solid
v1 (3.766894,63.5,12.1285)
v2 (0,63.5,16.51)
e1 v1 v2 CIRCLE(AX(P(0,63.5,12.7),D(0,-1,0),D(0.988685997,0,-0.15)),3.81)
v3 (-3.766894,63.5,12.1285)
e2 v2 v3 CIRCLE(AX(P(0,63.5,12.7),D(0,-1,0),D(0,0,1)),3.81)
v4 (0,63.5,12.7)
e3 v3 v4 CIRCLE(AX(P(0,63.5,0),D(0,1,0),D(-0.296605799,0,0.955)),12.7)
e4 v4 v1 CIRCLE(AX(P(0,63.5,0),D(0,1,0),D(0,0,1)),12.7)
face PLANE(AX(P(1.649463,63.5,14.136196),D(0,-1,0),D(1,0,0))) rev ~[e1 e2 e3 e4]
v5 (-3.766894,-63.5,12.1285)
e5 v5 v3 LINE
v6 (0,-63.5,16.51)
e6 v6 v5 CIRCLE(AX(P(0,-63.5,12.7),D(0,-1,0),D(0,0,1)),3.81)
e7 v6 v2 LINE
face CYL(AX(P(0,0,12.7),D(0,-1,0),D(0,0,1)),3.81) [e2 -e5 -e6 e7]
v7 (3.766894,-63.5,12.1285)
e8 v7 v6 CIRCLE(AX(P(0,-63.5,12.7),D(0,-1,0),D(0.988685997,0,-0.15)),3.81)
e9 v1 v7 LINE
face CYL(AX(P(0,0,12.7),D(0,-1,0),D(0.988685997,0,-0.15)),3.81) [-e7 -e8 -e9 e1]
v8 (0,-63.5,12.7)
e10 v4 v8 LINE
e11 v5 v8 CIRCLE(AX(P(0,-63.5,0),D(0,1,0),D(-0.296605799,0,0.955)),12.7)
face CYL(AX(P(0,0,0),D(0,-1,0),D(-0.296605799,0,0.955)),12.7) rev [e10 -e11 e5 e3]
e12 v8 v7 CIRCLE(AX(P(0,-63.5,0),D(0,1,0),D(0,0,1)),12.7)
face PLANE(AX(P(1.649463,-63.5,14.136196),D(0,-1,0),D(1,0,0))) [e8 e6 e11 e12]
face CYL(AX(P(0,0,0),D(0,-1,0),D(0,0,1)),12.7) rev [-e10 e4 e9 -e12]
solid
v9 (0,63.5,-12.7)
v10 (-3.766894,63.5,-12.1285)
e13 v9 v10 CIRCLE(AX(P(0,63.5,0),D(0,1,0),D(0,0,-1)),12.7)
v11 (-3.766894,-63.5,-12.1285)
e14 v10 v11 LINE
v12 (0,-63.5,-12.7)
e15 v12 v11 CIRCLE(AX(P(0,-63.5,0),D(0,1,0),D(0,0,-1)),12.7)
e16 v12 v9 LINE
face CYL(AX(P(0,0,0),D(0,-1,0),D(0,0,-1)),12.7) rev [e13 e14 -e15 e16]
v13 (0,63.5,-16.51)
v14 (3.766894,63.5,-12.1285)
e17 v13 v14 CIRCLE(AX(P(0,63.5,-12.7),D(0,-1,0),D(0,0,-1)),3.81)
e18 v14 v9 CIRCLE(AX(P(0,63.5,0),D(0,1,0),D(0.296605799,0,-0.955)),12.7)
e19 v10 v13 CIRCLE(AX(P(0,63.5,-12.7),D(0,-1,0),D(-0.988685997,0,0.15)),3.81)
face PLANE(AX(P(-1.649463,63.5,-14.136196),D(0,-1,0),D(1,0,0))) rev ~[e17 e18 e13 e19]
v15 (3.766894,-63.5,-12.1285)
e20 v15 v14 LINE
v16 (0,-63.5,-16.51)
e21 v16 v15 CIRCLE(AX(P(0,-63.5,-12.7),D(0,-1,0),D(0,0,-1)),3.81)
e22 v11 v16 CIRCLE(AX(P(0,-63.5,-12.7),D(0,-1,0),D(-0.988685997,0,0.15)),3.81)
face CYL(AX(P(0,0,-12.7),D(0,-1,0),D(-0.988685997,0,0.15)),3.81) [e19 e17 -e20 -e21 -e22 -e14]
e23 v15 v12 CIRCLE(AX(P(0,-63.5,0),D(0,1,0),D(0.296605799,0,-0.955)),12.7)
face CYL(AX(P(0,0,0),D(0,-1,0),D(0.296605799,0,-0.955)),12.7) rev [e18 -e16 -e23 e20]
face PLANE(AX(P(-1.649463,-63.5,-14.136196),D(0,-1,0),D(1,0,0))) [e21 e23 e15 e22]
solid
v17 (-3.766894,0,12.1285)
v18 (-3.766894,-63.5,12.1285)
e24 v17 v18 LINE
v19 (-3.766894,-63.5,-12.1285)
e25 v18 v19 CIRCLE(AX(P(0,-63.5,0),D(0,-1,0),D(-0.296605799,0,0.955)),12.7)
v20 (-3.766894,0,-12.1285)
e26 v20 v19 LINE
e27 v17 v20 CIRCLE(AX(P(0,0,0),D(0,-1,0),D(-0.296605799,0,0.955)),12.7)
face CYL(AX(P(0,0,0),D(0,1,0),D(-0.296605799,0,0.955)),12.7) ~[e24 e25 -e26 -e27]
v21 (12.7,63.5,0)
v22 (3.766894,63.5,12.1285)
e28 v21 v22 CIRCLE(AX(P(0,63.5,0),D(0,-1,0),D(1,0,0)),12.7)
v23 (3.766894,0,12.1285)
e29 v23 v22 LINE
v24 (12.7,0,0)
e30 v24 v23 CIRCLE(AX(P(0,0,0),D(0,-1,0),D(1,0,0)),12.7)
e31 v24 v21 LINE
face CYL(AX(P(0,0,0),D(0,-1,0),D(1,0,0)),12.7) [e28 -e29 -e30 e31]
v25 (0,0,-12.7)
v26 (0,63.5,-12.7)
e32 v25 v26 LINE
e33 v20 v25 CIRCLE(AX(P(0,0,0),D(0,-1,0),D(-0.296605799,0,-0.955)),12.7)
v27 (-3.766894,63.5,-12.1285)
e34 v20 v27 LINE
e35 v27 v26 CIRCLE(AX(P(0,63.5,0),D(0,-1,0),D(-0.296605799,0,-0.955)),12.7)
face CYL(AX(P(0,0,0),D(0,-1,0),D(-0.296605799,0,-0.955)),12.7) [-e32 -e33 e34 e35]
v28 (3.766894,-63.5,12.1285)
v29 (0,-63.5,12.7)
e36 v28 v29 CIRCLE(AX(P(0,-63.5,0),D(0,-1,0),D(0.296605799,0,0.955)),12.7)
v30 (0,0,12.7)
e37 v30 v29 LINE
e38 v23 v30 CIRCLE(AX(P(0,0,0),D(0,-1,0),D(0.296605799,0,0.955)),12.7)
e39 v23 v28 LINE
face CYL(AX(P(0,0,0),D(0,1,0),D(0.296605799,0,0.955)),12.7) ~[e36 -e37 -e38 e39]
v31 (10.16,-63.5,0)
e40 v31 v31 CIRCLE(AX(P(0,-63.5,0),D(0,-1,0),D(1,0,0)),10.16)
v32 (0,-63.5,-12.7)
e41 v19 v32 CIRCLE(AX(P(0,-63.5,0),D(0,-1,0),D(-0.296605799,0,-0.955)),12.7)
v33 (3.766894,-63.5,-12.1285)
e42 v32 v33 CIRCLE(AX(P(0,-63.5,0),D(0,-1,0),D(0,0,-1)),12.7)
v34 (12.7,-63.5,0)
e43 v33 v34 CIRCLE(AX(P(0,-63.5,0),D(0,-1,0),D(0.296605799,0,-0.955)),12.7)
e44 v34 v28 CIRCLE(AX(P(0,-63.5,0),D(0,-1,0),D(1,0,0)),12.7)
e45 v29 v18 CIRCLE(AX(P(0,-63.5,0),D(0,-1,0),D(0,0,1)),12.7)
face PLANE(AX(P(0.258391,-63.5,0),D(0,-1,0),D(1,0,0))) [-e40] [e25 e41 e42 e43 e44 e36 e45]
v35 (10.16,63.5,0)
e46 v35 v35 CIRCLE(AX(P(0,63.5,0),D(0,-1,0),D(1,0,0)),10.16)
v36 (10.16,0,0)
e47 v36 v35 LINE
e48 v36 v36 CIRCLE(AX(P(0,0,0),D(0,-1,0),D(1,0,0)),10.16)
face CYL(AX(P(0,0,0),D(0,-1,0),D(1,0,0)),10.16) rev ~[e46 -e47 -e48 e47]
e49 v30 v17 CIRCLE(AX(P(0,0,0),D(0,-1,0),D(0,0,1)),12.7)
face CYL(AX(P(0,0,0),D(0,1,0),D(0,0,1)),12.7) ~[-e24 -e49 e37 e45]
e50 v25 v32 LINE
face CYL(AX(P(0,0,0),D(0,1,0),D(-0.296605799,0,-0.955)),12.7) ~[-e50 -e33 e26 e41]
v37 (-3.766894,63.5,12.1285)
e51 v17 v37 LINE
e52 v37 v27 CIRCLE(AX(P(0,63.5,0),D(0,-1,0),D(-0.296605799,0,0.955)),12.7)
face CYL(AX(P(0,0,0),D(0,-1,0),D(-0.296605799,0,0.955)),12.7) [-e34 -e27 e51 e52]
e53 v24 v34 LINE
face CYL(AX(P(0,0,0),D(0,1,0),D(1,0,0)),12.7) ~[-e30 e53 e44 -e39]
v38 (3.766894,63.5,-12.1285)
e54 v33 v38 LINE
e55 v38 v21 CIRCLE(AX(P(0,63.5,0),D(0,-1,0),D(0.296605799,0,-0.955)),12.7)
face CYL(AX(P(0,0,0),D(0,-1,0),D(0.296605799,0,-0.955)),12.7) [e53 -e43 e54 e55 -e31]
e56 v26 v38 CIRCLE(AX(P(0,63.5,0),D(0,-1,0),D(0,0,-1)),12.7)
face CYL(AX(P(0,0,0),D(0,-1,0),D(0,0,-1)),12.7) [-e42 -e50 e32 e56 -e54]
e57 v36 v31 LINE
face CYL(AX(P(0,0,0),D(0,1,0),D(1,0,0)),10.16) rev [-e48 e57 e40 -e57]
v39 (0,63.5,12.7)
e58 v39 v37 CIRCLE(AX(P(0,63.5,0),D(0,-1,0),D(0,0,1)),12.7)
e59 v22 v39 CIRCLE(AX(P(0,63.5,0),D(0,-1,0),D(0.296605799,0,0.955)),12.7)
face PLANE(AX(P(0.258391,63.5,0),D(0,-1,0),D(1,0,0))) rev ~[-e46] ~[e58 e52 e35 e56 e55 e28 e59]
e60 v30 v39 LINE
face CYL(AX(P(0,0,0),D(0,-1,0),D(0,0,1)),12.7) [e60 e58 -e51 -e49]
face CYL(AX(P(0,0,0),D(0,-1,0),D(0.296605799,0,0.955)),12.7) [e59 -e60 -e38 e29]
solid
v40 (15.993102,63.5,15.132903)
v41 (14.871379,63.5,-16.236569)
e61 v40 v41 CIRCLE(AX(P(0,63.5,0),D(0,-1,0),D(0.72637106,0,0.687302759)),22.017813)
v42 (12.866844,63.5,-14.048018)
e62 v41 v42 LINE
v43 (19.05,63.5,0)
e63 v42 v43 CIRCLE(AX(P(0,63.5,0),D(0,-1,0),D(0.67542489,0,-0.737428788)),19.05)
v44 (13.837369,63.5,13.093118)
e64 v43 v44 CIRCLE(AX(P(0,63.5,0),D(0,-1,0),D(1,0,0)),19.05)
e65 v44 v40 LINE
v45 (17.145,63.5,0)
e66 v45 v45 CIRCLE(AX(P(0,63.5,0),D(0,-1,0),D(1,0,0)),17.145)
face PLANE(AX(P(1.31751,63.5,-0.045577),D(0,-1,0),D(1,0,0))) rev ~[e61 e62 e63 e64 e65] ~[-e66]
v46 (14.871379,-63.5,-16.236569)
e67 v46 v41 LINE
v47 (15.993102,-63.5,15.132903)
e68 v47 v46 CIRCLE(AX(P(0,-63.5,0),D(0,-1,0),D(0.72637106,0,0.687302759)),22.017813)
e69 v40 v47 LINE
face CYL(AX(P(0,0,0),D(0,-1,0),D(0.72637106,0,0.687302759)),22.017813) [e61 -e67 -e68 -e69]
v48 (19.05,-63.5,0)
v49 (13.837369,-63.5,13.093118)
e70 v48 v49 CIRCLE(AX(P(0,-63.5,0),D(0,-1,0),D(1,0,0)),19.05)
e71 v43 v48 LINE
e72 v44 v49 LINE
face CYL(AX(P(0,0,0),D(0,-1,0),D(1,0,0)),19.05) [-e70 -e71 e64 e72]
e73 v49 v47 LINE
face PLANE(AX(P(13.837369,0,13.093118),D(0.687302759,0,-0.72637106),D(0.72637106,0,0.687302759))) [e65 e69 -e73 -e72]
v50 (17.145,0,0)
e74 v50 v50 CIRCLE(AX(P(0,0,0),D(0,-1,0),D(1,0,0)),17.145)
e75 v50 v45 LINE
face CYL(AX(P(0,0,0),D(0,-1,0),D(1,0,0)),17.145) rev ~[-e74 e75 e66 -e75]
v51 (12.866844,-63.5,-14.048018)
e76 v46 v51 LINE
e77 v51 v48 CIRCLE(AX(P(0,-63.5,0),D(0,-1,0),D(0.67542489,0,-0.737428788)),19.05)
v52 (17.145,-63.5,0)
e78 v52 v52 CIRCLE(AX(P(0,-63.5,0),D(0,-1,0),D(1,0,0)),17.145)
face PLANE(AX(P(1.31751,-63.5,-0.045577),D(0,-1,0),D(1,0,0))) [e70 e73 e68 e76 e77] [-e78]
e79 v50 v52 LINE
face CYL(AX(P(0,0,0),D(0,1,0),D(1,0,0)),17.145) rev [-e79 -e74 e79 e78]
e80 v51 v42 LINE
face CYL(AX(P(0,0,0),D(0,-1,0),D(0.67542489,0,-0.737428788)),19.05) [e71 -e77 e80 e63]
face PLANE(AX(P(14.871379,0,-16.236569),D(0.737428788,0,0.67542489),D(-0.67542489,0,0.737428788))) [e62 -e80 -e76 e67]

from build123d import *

# Parameters (mm, degrees)
F8_DEPTH  = 63.5
F9_DEPTH  = 63.5
F10_DEPTH = 63.5
F0_R      = 17.145
F11_DEPTH = 63.5
F0_R_2    = 10.16
F12_DEPTH = 63.5


# Not quite as in the source:
# - the program builds the solid bodies; features that only make, move or delete a surface that nothing else refers to are left out


with BuildPart() as f8:
    # F0 (on Front) → F8 (new body, symmetric)
    with BuildSketch(Plane.XZ):
        with BuildLine():
            ThreePointArc((12.8668441558, -14.0480184179), (-19.037832377, 0.6807630905), (13.8373687009, 13.0931175598))
            Line((13.8373687009, 13.0931175598), (15.9931019877, 15.1329034441))
            ThreePointArc((15.9931019877, 15.1329034441), (-22.0037495142, 0.7868196455), (14.8713787493, -16.2365689705))
            Line((14.8713787493, -16.2365689705), (12.8668441558, -14.0480184179))
        make_face()
    extrude(amount=F8_DEPTH, both=True)

    # F0 (on Front) → F11 (join, symmetric)
    with BuildSketch(Plane.XZ):
        with BuildLine():
            ThreePointArc((12.8668441558, -14.0480184179), (17.4358234845, -7.6742790812), (19.05, 0))
            ThreePointArc((19.05, 0), (17.6989318004, 7.0462978311), (13.8373687009, 13.0931175598))
            ThreePointArc((13.8373687009, 13.0931175598), (-19.037832377, 0.6807630905), (12.8668441558, -14.0480184179))
        make_face()
        Circle(F0_R, mode=Mode.SUBTRACT)
    extrude(amount=F11_DEPTH, both=True)


with BuildPart() as f9:
    # F0 (on Front) → F9 (new body, symmetric)
    with BuildSketch(Plane.XZ):
        with BuildLine():
            ThreePointArc((-3.7668936473, 12.1285), (-1.905, 12.5563121576), (0, 12.7))
            Line((0, 12.7), (0, 16.51))
            ThreePointArc((0, 16.51), (-2.8890755442, 15.1838161164), (-3.7668936473, 12.1285))
        make_face()
    extrude(amount=F9_DEPTH, both=True)

    # F0 (on Front) → F10 (join, symmetric)
    with BuildSketch(Plane.XZ):
        with BuildLine():
            ThreePointArc((0, 12.7), (1.905, 12.5563121576), (3.7668936473, 12.1285))
            ThreePointArc((3.7668936473, 12.1285), (2.8890755442, 15.1838161164), (0, 16.51))
            Line((0, 16.51), (0, 12.7))
        make_face()
    extrude(amount=F10_DEPTH, both=True)


with BuildPart() as f10:
    # F0 (on Front) → F10, piece 2 (new body, symmetric)
    with BuildSketch(Plane.XZ):
        with BuildLine():
            Line((0, -16.51), (0, -12.7))
            ThreePointArc((0, -12.7), (-1.905, -12.5563121576), (-3.7668936473, -12.1285))
            ThreePointArc((-3.7668936473, -12.1285), (-2.8890755442, -15.1838161164), (0, -16.51))
        make_face()
        with BuildLine():
            ThreePointArc((0, -16.51), (2.8890755442, -15.1838161164), (3.7668936473, -12.1285))
            ThreePointArc((3.7668936473, -12.1285), (1.905, -12.5563121576), (0, -12.7))
            Line((0, -12.7), (0, -16.51))
        make_face()
    extrude(amount=F10_DEPTH, both=True)


with BuildPart() as f12:
    # F0 (on Front) → F12 (new body, symmetric)
    with BuildSketch(Plane.XZ):
        with BuildLine():
            ThreePointArc((3.7668936473, -12.1285), (10.2256918915, -7.5316150552), (12.7, 0))
            ThreePointArc((12.7, 0), (10.2256918915, 7.5316150552), (3.7668936473, 12.1285))
            ThreePointArc((3.7668936473, 12.1285), (1.905, 12.5563121576), (0, 12.7))
            ThreePointArc((0, 12.7), (-1.905, 12.5563121576), (-3.7668936473, 12.1285))
            ThreePointArc((-3.7668936473, 12.1285), (-12.7, 0), (-3.7668936473, -12.1285))
            ThreePointArc((-3.7668936473, -12.1285), (-1.905, -12.5563121576), (0, -12.7))
            ThreePointArc((0, -12.7), (1.905, -12.5563121576), (3.7668936473, -12.1285))
        make_face()
        Circle(F0_R_2, mode=Mode.SUBTRACT)
    extrude(amount=F12_DEPTH, both=True)


solid = Compound([f8.part, f9.part, f10.part, f12.part])
